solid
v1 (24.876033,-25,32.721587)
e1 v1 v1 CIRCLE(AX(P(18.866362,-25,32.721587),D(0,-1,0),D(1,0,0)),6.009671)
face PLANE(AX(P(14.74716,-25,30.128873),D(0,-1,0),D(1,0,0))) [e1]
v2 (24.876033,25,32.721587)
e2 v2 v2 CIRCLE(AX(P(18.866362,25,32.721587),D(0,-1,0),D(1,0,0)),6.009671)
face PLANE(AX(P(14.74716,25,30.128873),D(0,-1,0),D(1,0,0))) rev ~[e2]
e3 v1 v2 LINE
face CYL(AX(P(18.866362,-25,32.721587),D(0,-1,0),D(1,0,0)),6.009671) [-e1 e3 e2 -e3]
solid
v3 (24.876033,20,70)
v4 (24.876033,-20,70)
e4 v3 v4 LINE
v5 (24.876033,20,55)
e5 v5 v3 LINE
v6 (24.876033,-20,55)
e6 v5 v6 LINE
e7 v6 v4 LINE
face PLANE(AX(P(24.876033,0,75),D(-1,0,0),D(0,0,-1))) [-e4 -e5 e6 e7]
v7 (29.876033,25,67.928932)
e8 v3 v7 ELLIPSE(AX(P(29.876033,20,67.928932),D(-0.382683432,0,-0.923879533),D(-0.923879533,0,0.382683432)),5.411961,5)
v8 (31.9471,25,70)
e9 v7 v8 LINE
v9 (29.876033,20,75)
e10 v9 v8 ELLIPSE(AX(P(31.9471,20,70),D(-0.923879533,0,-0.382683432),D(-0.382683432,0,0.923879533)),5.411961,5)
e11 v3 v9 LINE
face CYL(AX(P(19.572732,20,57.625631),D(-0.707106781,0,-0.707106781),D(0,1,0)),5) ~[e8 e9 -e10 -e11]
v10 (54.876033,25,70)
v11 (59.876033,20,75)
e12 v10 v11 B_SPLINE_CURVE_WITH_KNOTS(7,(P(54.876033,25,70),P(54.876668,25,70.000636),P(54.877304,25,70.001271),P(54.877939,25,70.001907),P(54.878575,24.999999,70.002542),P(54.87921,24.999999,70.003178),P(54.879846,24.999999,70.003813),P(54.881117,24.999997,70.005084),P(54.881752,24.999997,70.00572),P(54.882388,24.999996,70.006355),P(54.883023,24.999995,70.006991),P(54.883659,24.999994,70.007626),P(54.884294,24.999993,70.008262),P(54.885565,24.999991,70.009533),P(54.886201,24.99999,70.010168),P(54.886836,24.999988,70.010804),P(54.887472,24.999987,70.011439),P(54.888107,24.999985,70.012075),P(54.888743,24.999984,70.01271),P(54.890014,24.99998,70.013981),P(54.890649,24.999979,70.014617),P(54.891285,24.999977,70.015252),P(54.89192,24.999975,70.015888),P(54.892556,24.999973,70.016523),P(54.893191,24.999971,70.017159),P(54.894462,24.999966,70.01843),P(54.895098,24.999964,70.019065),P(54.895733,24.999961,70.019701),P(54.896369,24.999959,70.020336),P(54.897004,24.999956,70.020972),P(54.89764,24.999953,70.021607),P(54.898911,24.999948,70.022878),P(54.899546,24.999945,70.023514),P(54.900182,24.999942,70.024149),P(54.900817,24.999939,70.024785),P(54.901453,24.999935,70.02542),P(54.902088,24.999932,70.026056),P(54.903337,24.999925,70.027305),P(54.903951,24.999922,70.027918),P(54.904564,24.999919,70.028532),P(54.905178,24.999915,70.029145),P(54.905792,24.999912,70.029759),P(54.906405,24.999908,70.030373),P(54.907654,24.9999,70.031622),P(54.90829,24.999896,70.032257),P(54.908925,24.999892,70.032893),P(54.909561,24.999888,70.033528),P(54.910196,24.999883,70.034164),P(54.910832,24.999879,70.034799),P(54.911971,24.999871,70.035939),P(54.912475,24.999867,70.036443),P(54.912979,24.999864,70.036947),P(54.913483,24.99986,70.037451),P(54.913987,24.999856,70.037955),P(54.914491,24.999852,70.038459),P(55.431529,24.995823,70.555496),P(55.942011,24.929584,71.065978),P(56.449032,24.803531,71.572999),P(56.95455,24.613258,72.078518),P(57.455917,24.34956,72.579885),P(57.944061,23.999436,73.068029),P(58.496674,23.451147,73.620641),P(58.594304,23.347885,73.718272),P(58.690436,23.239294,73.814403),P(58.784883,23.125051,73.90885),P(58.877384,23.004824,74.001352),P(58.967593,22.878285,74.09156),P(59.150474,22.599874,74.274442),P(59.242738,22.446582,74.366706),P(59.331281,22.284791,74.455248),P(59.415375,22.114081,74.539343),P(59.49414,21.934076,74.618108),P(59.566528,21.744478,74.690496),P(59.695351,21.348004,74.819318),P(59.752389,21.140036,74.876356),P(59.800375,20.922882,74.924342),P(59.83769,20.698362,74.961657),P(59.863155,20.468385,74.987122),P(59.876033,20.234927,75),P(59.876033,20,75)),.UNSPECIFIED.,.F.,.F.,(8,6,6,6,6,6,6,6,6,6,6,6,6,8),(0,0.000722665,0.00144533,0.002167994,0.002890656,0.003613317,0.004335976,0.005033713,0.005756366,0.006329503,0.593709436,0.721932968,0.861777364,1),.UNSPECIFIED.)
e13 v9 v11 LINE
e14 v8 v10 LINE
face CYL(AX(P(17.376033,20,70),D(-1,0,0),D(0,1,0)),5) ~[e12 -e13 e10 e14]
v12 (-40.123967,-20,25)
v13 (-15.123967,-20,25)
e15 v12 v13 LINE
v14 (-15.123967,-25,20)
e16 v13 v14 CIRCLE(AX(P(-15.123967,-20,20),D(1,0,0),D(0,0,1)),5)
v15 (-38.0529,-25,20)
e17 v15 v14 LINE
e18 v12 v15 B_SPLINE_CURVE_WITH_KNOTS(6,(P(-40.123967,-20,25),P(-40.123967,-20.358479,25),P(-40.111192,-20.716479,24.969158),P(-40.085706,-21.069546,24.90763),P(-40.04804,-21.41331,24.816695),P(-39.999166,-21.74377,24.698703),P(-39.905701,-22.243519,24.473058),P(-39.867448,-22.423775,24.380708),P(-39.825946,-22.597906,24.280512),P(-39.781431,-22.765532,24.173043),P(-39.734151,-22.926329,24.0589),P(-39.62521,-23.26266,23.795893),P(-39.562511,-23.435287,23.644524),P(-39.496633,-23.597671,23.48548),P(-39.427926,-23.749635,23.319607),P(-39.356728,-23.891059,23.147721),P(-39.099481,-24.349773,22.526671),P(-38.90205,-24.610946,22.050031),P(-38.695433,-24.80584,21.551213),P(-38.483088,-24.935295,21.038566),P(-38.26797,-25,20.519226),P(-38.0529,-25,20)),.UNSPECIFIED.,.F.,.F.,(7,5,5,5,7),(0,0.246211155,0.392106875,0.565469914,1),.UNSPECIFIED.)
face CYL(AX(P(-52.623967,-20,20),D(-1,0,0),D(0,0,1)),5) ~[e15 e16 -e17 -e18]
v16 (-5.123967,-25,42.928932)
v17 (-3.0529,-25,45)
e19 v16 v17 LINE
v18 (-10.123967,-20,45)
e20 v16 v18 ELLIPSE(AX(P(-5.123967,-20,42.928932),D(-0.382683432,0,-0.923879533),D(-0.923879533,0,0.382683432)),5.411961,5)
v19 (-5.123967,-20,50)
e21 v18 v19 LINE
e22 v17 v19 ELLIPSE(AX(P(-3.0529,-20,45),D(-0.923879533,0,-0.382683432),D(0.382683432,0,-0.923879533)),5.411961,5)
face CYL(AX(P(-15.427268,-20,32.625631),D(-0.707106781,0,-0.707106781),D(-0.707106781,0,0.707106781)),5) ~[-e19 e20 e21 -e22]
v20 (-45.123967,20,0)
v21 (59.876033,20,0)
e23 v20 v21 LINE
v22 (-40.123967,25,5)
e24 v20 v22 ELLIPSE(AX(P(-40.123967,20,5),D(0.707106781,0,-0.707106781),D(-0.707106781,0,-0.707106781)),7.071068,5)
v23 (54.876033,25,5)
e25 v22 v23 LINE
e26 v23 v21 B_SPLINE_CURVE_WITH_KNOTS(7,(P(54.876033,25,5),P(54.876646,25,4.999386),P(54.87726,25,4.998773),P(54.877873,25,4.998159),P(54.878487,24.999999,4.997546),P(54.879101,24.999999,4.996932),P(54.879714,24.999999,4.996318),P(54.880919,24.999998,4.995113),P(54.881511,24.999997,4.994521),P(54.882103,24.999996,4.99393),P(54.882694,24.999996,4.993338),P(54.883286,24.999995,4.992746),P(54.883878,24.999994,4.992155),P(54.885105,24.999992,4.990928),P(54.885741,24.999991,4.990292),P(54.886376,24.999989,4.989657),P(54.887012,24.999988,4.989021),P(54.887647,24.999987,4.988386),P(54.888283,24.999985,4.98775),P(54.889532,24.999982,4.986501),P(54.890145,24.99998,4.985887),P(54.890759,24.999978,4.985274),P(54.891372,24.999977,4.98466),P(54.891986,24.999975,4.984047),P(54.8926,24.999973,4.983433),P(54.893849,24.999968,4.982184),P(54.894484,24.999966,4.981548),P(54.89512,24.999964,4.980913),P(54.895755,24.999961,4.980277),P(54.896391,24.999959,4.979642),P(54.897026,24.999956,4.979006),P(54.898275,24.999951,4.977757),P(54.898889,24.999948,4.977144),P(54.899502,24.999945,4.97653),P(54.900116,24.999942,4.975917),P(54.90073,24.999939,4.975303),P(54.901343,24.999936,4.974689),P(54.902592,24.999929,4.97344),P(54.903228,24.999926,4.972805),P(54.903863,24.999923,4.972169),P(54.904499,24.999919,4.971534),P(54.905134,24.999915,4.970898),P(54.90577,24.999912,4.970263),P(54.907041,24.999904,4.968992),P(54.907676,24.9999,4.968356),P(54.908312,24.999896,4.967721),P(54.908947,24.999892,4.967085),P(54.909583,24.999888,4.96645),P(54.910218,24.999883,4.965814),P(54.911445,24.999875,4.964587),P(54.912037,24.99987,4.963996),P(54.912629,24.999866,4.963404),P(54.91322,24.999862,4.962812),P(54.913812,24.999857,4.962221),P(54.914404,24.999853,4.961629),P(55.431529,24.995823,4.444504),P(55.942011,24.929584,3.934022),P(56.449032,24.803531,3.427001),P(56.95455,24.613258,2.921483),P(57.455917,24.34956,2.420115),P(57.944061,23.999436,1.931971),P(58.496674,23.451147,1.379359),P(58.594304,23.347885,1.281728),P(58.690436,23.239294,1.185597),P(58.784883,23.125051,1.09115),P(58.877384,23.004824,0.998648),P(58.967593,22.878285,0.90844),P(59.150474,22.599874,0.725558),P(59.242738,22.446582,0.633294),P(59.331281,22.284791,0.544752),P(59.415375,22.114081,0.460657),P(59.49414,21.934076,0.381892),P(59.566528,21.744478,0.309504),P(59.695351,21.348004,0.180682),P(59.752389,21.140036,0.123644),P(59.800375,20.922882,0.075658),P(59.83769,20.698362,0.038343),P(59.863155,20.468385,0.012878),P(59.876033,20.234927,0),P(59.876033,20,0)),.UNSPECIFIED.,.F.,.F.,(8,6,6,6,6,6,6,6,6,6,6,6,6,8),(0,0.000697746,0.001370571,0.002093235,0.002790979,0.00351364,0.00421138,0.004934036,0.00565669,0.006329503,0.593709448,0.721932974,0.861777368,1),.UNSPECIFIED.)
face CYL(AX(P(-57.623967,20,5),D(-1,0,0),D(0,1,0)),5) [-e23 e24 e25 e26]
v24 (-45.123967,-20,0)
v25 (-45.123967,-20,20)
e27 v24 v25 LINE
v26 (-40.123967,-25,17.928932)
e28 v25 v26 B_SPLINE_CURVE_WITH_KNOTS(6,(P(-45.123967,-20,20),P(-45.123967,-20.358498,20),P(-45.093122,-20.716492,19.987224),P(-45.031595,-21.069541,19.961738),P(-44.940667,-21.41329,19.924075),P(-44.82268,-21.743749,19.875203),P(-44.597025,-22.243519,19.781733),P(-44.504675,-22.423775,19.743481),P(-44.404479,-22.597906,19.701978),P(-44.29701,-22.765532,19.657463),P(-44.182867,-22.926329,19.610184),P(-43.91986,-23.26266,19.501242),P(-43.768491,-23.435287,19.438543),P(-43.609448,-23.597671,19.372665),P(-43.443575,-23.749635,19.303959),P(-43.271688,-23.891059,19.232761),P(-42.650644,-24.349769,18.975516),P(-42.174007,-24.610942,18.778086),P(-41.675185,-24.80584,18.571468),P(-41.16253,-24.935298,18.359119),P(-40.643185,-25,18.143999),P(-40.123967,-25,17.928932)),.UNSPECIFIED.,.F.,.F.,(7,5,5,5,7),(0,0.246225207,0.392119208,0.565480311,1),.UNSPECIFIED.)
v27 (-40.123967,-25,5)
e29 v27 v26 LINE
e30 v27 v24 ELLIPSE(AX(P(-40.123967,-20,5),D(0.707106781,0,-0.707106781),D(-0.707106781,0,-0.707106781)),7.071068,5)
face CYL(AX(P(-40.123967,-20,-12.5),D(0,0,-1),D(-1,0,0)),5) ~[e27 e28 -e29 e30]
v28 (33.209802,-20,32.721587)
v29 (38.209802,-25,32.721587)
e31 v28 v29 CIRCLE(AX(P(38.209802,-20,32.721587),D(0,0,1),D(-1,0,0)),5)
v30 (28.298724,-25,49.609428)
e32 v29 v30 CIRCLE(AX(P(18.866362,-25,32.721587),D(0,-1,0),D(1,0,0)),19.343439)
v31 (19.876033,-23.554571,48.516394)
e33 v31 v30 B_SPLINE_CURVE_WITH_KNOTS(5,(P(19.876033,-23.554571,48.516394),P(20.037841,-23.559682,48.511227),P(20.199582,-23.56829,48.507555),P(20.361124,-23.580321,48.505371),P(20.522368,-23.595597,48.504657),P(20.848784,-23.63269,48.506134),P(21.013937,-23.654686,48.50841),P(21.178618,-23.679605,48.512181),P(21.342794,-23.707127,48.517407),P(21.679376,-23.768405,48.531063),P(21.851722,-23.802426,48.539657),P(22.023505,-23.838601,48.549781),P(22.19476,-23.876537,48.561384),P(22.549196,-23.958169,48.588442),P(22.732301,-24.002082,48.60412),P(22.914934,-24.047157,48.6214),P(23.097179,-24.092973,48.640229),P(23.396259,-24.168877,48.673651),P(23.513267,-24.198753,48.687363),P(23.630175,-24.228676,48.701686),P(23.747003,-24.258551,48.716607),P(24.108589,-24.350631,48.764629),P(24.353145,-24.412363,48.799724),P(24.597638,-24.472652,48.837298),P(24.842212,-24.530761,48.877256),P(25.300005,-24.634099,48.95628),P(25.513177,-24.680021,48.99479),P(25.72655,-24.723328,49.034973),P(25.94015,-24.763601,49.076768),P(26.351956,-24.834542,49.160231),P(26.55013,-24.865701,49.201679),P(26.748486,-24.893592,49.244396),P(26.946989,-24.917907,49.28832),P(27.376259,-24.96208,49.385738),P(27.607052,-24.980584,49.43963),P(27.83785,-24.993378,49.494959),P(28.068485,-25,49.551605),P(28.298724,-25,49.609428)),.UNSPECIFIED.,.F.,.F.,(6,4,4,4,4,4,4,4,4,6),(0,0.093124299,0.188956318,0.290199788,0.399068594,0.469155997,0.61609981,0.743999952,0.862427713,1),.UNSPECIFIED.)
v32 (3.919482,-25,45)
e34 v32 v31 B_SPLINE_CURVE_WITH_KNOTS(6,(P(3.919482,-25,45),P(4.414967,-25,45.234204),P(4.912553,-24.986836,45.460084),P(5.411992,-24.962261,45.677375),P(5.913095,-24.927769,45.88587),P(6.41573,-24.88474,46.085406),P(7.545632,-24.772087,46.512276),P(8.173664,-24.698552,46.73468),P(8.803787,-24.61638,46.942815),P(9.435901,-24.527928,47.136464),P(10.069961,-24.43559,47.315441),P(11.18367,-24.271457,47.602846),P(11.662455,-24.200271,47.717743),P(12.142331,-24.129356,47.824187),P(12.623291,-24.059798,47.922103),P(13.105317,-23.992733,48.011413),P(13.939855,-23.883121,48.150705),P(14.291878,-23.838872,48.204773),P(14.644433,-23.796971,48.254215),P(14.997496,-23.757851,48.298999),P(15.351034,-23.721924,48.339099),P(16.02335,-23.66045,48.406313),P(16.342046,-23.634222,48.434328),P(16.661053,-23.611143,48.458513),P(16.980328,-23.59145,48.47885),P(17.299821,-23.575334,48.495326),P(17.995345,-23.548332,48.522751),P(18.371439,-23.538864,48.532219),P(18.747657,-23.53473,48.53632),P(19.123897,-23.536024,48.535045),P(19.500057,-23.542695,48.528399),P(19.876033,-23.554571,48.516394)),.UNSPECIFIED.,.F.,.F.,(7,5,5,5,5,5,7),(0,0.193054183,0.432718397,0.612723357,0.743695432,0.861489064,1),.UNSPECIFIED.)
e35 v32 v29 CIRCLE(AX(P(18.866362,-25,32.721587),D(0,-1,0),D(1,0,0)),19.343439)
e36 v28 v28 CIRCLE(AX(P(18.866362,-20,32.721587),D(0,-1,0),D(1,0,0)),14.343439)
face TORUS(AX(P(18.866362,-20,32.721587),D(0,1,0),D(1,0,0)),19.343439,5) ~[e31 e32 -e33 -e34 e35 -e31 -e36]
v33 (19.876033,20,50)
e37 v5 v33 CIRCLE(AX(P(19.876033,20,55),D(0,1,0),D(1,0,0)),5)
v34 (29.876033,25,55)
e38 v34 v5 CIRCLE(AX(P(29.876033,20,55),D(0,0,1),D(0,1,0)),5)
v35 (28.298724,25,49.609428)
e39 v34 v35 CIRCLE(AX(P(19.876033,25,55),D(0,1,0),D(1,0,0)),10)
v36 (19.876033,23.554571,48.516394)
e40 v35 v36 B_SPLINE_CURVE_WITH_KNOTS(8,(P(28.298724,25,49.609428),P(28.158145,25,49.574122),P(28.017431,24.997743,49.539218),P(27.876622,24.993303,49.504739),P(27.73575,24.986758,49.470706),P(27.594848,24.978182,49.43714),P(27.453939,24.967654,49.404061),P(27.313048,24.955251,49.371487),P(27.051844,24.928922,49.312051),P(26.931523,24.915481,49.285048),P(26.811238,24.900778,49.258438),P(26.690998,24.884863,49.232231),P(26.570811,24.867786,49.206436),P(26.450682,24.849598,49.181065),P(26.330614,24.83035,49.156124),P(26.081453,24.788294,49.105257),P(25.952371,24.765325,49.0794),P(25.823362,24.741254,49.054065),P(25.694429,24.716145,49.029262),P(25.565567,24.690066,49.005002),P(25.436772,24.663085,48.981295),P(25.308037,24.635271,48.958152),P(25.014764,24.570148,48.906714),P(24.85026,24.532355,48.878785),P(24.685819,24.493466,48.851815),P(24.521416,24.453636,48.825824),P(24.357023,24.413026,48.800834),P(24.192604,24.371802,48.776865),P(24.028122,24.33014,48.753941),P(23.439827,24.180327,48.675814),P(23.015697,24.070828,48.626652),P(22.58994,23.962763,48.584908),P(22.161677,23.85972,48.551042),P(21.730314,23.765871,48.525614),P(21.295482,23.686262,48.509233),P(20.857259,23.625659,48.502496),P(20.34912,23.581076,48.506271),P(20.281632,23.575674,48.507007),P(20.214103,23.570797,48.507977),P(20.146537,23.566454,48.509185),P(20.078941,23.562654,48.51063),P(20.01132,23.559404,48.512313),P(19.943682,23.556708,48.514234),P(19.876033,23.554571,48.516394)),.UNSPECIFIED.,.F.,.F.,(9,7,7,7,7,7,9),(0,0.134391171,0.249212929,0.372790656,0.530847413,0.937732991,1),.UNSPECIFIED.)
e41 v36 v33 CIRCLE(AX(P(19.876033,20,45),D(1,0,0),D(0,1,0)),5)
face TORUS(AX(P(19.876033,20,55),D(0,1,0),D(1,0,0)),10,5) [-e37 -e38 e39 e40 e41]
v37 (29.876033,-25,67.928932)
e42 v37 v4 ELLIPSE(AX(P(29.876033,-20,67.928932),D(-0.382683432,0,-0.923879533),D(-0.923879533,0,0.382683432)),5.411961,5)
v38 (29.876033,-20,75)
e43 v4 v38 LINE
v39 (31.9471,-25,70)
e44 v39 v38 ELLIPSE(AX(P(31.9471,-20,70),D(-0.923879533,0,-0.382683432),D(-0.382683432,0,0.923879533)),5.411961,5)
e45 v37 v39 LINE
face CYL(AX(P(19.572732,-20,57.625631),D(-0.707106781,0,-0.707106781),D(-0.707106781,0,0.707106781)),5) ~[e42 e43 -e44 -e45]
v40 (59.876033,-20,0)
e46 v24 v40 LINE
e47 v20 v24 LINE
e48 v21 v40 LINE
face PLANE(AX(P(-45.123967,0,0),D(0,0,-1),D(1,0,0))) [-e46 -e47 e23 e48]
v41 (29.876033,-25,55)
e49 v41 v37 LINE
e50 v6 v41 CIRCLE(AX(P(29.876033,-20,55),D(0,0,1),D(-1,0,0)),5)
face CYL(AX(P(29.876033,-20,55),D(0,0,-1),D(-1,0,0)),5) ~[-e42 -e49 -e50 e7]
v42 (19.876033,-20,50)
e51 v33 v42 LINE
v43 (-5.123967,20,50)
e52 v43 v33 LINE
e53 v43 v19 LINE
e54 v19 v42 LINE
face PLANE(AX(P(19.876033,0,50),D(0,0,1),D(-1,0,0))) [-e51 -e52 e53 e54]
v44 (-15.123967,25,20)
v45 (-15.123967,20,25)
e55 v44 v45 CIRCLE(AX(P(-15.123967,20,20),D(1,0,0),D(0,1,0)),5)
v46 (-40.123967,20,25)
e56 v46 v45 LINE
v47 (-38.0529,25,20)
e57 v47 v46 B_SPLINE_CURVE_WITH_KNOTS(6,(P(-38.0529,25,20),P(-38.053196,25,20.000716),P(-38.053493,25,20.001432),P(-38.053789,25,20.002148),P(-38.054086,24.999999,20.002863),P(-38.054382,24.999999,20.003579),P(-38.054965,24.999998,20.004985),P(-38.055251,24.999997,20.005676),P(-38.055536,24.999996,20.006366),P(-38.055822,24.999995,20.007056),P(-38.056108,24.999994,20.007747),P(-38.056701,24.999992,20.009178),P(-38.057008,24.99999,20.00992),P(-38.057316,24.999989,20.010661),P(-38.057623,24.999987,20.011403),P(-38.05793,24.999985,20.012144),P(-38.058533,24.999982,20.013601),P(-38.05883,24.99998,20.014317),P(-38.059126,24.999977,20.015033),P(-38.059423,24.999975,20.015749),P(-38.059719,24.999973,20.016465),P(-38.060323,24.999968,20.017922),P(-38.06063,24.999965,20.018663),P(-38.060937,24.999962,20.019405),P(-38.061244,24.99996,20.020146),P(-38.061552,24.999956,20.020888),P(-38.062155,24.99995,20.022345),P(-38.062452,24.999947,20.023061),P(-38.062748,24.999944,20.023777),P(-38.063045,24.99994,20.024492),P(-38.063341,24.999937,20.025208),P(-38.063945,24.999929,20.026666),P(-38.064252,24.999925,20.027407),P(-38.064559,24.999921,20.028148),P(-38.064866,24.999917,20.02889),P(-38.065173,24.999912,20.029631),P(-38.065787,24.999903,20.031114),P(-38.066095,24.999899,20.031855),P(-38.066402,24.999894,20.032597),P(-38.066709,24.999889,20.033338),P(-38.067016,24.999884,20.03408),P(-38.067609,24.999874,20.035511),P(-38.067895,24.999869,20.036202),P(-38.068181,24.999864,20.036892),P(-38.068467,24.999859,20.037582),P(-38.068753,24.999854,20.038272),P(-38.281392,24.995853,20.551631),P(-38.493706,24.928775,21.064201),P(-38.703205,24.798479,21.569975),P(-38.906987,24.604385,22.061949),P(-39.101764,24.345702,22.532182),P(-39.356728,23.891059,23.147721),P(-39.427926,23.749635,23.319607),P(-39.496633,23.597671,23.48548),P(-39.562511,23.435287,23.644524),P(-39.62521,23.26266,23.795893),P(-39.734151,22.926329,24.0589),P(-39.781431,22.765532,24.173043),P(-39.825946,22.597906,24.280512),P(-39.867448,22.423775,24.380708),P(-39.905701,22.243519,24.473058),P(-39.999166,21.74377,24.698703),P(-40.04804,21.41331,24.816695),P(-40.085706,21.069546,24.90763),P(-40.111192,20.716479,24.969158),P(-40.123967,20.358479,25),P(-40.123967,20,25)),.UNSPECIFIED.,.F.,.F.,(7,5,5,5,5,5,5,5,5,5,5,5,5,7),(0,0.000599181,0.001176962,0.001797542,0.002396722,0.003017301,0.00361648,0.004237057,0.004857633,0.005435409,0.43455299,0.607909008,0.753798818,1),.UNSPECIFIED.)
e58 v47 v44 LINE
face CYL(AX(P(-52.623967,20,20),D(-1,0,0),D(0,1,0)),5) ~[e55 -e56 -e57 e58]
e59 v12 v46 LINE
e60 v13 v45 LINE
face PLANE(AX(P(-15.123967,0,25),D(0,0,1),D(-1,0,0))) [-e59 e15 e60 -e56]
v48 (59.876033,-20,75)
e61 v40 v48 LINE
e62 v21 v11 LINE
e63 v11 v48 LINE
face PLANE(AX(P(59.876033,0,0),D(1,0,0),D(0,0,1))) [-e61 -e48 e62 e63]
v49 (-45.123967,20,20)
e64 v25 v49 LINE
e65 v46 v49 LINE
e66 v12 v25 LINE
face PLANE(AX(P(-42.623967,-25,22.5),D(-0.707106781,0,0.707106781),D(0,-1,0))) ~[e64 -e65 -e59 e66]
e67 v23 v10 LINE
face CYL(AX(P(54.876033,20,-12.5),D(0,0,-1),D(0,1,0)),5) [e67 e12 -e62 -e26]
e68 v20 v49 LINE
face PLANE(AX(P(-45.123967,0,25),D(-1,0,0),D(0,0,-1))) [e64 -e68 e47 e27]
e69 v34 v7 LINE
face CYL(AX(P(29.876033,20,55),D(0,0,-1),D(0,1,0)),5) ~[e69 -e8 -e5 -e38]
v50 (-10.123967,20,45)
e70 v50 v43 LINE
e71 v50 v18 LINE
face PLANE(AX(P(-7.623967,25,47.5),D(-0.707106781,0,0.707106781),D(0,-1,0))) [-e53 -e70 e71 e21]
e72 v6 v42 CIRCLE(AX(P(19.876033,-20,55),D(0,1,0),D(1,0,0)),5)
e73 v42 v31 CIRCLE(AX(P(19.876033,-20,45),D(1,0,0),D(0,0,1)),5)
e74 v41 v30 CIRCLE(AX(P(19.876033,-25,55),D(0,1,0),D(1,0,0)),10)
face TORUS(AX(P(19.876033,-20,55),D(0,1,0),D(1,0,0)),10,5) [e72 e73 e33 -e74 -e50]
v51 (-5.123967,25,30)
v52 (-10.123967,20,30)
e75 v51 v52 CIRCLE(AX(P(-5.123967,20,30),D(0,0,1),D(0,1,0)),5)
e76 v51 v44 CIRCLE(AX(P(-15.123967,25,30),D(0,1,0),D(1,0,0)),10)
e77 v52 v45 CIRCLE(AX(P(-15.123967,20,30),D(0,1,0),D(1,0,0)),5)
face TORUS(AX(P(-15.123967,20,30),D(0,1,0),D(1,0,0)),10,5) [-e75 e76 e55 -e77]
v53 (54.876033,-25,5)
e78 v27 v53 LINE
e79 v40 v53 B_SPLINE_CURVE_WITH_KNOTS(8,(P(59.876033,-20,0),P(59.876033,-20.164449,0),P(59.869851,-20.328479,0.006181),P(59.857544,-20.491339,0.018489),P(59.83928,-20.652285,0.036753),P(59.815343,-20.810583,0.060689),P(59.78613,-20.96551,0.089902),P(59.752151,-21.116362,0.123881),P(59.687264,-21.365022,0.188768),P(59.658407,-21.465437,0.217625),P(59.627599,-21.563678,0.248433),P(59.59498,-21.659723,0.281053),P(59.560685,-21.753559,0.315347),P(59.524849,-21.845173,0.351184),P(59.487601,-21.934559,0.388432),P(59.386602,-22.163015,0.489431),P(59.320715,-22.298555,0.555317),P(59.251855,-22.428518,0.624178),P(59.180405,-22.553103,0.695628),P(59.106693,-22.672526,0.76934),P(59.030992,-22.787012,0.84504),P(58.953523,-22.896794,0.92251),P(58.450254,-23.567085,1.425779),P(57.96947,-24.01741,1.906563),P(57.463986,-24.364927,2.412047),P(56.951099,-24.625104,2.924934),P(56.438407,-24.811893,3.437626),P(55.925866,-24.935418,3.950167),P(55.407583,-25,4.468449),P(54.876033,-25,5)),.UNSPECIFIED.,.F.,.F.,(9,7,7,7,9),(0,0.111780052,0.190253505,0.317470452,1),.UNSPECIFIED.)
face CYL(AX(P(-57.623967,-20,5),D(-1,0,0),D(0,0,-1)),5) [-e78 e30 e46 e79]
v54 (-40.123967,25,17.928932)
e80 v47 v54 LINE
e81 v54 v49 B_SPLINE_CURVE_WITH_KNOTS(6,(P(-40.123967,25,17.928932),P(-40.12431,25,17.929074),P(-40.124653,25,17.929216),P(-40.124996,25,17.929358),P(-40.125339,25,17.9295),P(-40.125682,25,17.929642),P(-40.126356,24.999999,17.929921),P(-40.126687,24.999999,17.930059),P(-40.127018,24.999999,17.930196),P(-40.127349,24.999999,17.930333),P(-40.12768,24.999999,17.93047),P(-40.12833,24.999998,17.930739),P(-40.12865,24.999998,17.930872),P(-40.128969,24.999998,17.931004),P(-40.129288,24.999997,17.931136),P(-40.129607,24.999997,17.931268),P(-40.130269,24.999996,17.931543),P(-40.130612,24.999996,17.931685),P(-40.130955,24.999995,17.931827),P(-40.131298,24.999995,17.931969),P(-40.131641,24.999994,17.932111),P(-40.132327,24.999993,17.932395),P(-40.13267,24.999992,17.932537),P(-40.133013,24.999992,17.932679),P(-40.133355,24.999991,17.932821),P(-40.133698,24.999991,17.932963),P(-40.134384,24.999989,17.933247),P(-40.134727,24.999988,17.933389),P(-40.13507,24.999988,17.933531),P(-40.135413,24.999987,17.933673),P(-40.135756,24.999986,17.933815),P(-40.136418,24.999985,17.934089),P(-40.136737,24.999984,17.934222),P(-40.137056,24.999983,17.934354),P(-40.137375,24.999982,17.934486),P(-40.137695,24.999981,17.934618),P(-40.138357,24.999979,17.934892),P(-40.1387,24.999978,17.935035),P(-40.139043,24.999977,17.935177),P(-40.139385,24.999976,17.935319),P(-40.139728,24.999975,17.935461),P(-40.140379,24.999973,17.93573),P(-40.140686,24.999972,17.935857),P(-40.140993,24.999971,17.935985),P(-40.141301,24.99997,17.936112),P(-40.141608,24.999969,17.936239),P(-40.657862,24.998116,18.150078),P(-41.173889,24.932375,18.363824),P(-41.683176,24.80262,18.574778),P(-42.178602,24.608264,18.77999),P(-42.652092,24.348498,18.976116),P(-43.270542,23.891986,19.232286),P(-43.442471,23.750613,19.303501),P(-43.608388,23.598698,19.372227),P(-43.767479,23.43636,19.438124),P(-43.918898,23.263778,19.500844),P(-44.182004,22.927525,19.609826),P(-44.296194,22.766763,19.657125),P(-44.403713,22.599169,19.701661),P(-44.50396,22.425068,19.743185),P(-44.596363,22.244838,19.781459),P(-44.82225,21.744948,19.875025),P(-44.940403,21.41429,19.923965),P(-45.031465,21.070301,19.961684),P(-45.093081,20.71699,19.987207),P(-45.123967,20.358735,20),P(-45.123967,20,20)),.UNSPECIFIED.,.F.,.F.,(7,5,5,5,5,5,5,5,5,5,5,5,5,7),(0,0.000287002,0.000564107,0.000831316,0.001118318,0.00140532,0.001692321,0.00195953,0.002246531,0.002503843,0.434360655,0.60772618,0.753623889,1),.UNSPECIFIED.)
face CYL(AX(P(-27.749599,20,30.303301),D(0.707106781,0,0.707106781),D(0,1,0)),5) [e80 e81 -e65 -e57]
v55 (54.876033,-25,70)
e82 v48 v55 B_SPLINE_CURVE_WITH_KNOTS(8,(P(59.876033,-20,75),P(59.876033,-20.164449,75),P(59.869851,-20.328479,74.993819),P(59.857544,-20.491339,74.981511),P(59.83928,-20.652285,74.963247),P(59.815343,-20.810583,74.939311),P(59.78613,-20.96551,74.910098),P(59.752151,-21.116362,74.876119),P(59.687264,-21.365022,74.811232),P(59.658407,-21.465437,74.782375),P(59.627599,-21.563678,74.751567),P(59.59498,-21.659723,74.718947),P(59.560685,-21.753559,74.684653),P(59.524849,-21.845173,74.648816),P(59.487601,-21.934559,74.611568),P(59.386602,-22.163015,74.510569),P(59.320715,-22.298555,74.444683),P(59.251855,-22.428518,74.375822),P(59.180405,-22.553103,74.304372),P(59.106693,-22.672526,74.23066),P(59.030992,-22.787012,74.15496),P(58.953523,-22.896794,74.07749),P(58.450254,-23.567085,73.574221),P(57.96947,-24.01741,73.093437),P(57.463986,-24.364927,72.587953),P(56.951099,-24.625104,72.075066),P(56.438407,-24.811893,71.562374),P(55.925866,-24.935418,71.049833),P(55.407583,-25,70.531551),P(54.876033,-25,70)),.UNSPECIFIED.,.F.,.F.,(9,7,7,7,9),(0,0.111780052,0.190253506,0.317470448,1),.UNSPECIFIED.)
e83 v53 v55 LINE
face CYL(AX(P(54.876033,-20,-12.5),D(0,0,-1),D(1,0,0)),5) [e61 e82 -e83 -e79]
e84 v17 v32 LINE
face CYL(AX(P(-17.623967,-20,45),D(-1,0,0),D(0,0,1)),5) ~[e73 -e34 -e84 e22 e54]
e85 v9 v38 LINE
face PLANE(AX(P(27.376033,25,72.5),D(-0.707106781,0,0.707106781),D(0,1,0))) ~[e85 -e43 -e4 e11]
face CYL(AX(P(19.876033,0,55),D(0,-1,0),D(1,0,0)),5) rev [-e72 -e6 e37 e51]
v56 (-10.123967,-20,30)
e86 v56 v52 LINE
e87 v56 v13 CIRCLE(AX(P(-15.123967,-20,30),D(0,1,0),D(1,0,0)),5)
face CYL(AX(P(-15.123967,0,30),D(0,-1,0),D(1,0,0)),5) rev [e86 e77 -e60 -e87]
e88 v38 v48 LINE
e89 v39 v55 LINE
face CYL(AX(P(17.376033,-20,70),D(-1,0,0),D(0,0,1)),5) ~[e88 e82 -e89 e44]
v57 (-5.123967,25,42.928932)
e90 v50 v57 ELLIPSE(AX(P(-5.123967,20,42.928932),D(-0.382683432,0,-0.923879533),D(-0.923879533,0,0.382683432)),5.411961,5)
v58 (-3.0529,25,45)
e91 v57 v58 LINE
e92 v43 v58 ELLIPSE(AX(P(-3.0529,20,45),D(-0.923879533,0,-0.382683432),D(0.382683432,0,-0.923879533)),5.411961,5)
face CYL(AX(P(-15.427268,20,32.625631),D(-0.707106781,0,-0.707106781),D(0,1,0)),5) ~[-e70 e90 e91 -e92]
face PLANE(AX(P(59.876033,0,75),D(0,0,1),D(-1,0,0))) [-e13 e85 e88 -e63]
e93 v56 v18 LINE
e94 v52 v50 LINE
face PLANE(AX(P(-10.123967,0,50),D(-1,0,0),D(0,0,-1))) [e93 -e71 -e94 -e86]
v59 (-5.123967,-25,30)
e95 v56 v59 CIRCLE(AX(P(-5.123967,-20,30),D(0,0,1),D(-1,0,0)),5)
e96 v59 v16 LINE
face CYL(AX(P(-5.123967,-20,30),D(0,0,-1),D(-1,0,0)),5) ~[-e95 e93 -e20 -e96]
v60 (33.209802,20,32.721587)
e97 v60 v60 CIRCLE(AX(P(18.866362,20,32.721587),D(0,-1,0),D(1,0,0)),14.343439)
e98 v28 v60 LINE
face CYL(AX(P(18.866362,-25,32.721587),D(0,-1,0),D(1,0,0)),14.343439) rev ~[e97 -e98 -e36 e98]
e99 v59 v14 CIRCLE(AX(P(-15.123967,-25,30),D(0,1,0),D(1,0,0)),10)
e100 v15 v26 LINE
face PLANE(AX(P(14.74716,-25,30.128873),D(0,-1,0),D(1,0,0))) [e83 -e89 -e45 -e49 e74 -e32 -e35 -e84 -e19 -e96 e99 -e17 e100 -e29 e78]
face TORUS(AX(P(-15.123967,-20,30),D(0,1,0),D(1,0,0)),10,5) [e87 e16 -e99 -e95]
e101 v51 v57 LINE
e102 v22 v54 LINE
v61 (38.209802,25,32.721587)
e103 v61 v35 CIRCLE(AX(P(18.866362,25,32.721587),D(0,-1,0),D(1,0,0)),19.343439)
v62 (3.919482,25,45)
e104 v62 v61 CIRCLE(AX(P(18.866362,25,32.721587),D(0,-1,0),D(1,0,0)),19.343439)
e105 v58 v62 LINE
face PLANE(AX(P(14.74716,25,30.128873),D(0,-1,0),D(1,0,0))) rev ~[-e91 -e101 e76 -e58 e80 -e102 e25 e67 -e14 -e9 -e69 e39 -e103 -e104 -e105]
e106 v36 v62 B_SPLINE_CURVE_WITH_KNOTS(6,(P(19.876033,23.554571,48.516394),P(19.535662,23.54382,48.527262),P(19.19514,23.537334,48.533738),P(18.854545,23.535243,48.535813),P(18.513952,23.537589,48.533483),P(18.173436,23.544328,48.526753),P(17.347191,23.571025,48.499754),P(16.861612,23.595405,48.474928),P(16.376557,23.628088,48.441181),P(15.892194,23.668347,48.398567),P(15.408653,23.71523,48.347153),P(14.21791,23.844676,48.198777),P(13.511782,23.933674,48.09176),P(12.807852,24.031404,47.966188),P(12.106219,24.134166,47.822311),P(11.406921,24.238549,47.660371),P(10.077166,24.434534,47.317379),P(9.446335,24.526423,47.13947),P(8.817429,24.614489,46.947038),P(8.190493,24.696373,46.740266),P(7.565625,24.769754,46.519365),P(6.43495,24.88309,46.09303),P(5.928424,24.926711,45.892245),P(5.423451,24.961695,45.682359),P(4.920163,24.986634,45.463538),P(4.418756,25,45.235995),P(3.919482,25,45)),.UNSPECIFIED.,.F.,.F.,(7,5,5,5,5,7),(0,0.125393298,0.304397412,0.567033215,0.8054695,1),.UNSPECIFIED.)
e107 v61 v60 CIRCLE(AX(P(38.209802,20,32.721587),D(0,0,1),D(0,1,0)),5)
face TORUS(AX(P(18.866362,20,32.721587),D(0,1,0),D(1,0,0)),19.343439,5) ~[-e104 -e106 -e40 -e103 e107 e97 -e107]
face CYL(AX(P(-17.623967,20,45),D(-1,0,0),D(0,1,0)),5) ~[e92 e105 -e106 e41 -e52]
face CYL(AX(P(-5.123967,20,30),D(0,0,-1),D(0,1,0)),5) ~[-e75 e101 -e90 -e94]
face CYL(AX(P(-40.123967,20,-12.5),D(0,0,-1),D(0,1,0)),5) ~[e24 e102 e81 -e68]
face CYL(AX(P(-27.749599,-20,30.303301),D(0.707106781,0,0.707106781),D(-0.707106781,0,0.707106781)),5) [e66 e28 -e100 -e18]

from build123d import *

# Parameters (mm, degrees)
F1_DEPTH     = 25
F2_R         = 14.3434394771
F2_R_2       = 6.0096705541
F3_DEPTH     = 50
F4_SIZE      = 5
F5_T1_DEPTH  = 55
F5_T3_DEPTH  = 32.0710678119
F5_T5_DEPTH  = 27.5
F5_T7_DEPTH  = 32.0710678119
F5_T9_DEPTH  = 27.5
F5_T11_DEPTH = 37.5
F5_T13_DEPTH = 37.5
F5_T15_DEPTH = 32.0710678119
F5_T17_DEPTH = 45
F5_T19_DEPTH = 130
F5_T21_DEPTH = 100
F5_T24_ANGLE = 90
F5_T26_ANGLE = 90
F5_T30_ANGLE = 90
F5_T32_ANGLE = 90


# Not quite as in the source:
# - a fillet or chamfer that OpenCascade refuses, or shapes differently, is made with other operations: its cross-section is extruded or revolved along the edge and cut away or added


with BuildPart() as f1:
    # F0 (on Front) → F1 (new body, symmetric)
    with BuildSketch(Plane.XZ):
        with BuildLine():
            Line((-45.1239673958, 25), (-45.1239673958, 0))
            Line((-45.1239673958, 0), (59.8760326042, 0))
            Line((59.8760326042, 0), (59.8760326042, 75))
            Line((59.8760326042, 75), (24.8760326042, 75))
            Line((24.8760326042, 75), (24.8760326042, 55))
            ThreePointArc((24.8760326042, 55), (23.4115665102, 51.4644660941), (19.8760326042, 50))
            Line((19.8760326042, 50), (-10.1239673958, 50))
            Line((-10.1239673958, 50), (-10.1239673958, 30))
            ThreePointArc((-10.1239673958, 30), (-11.5884334898, 26.4644660941), (-15.1239673958, 25))
            Line((-15.1239673958, 25), (-45.1239673958, 25))
        make_face()
    extrude(amount=F1_DEPTH, both=True)

    # F2 (on face) → F3 (cut, through all)
    with BuildSketch(Plane.XZ.offset(25)):
        with Locations((18.8663620502, 32.7215865254)):
            Circle(F2_R)
        with Locations((18.8663620502, 32.7215865254)):
            Circle(F2_R_2, mode=Mode.SUBTRACT)
    extrude(amount=-F3_DEPTH, mode=Mode.SUBTRACT)

    # F4
    f4_edges = [f1.edges().sort_by_distance(p)[0] for p in [
        (-45.123967, 0, 25),
        (-10.123967, 0, 50),
        (24.876033, 0, 75),
    ]]
    chamfer(f4_edges, length=F4_SIZE)

    # F5: fillet of radius 5 on 28 edges, made by hand

    # F5_s2 → F5_t1 (cut)
    with BuildSketch(Plane.YZ.offset(17.3760326042)):
        with BuildLine():
            ThreePointArc((-20, 75), (-23.5355339059, 73.5355339059), (-25, 70))
            Line((-25, 70), (-25, 75))
            Line((-25, 75), (-20, 75))
        make_face()
        with BuildLine():
            ThreePointArc((25, 70), (23.5355339059, 73.5355339059), (20, 75))
            Line((20, 75), (25, 75))
            Line((25, 75), (25, 70))
        make_face()
    extrude(amount=F5_T1_DEPTH, mode=Mode.SUBTRACT)

    # F5_s4 → F5_t3 (cut)
    with BuildSketch(Plane(origin=(38.5991815373, 0, 38.5991815373), x_dir=(0, 1, 0), z_dir=(0.7071067812, 0, 0.7071067812))):
        with BuildLine():
            ThreePointArc((-20, 31.9074633396), (-23.5355339059, 30.4429972455), (-25, 26.9074633396))
            Line((-25, 26.9074633396), (-25, 31.9074633396))
            Line((-25, 31.9074633396), (-20, 31.9074633396))
        make_face()
        with BuildLine():
            ThreePointArc((25, 26.9074633396), (23.5355339059, 30.4429972455), (20, 31.9074633396))
            Line((20, 31.9074633396), (25, 31.9074633396))
            Line((25, 31.9074633396), (25, 26.9074633396))
        make_face()
    extrude(amount=F5_T3_DEPTH, mode=Mode.SUBTRACT)

    # F5_s6 → F5_t5 (cut)
    with BuildSketch(Plane.XY.offset(55)):
        with BuildLine():
            ThreePointArc((24.8760326042, -20), (26.3404986983, -23.5355339059), (29.8760326042, -25))
            Line((29.8760326042, -25), (24.8760326042, -25))
            Line((24.8760326042, -25), (24.8760326042, -20))
        make_face()
        with BuildLine():
            ThreePointArc((29.8760326042, 25), (26.3404986983, 23.5355339059), (24.8760326042, 20))
            Line((24.8760326042, 20), (24.8760326042, 25))
            Line((24.8760326042, 25), (29.8760326042, 25))
        make_face()
    extrude(amount=F5_T5_DEPTH, mode=Mode.SUBTRACT)

    # F5_s8 → F5_t7 (cut)
    with BuildSketch(Plane(origin=(8.5991815373, 0, 8.5991815373), x_dir=(0, 1, 0), z_dir=(0.7071067812, 0, 0.7071067812))):
        with BuildLine():
            ThreePointArc((-20, 38.9785311515), (-23.5355339059, 37.5140650574), (-25, 33.9785311515))
            Line((-25, 33.9785311515), (-25, 38.9785311515))
            Line((-25, 38.9785311515), (-20, 38.9785311515))
        make_face()
        with BuildLine():
            ThreePointArc((25, 33.9785311515), (23.5355339059, 37.5140650574), (20, 38.9785311515))
            Line((20, 38.9785311515), (25, 38.9785311515))
            Line((25, 38.9785311515), (25, 33.9785311515))
        make_face()
    extrude(amount=F5_T7_DEPTH, mode=Mode.SUBTRACT)

    # F5_s10 → F5_t9 (cut)
    with BuildSketch(Plane.XY.offset(30)):
        with BuildLine():
            ThreePointArc((-10.1239673958, -20), (-8.6595013017, -23.5355339059), (-5.1239673958, -25))
            Line((-5.1239673958, -25), (-10.1239673958, -25))
            Line((-10.1239673958, -25), (-10.1239673958, -20))
        make_face()
        with BuildLine():
            ThreePointArc((-5.1239673958, 25), (-8.6595013017, 23.5355339059), (-10.1239673958, 20))
            Line((-10.1239673958, 20), (-10.1239673958, 25))
            Line((-10.1239673958, 25), (-5.1239673958, 25))
        make_face()
    extrude(amount=F5_T9_DEPTH, mode=Mode.SUBTRACT)

    # F5_s12 → F5_t11 (cut)
    with BuildSketch(Plane.YZ.offset(-17.6239673958)):
        with BuildLine():
            ThreePointArc((-20, 50), (-23.5355339059, 48.5355339059), (-25, 45))
            Line((-25, 45), (-25, 50))
            Line((-25, 50), (-20, 50))
        make_face()
        with BuildLine():
            ThreePointArc((25, 45), (23.5355339059, 48.5355339059), (20, 50))
            Line((20, 50), (25, 50))
            Line((25, 50), (25, 45))
        make_face()
    extrude(amount=F5_T11_DEPTH, mode=Mode.SUBTRACT)

    # F5_s14 → F5_t13 (cut)
    with BuildSketch(Plane.YZ.offset(-52.6239673958)):
        with BuildLine():
            ThreePointArc((-20, 25), (-23.5355339059, 23.5355339059), (-25, 20))
            Line((-25, 20), (-25, 25))
            Line((-25, 25), (-20, 25))
        make_face()
        with BuildLine():
            ThreePointArc((25, 20), (23.5355339059, 23.5355339059), (20, 25))
            Line((20, 25), (25, 25))
            Line((25, 25), (25, 20))
        make_face()
    extrude(amount=F5_T13_DEPTH, mode=Mode.SUBTRACT)

    # F5_s16 → F5_t15 (cut)
    with BuildSketch(Plane(origin=(1.2768510669, 0, 1.2768510669), x_dir=(0, 1, 0), z_dir=(-0.7071067812, 0, -0.7071067812))):
        with BuildLine():
            ThreePointArc((-20, -46.0495989633), (-23.5355339059, -44.5851328693), (-25, -41.0495989633))
            Line((-25, -41.0495989633), (-25, -46.0495989633))
            Line((-25, -46.0495989633), (-20, -46.0495989633))
        make_face()
        with BuildLine():
            ThreePointArc((25, -41.0495989633), (23.5355339059, -44.5851328693), (20, -46.0495989633))
            Line((20, -46.0495989633), (25, -46.0495989633))
            Line((25, -46.0495989633), (25, -41.0495989633))
        make_face()
    extrude(amount=F5_T15_DEPTH, mode=Mode.SUBTRACT)

    # F5_s18 → F5_t17 (cut)
    with BuildSketch(Plane.XY.offset(-12.5)):
        with BuildLine():
            ThreePointArc((-45.1239673958, -20), (-43.6595013017, -23.5355339059), (-40.1239673958, -25))
            Line((-40.1239673958, -25), (-45.1239673958, -25))
            Line((-45.1239673958, -25), (-45.1239673958, -20))
        make_face()
        with BuildLine():
            ThreePointArc((-40.1239673958, 25), (-43.6595013017, 23.5355339059), (-45.1239673958, 20))
            Line((-45.1239673958, 20), (-45.1239673958, 25))
            Line((-45.1239673958, 25), (-40.1239673958, 25))
        make_face()
    extrude(amount=F5_T17_DEPTH, mode=Mode.SUBTRACT)

    # F5_s20 → F5_t19 (cut)
    with BuildSketch(Plane.YZ.offset(-57.6239673958)):
        with BuildLine():
            ThreePointArc((-20, 0), (-23.5355339059, 1.4644660941), (-25, 5))
            Line((-25, 5), (-25, 0))
            Line((-25, 0), (-20, 0))
        make_face()
        with BuildLine():
            ThreePointArc((25, 5), (23.5355339059, 1.4644660941), (20, 0))
            Line((20, 0), (25, 0))
            Line((25, 0), (25, 5))
        make_face()
    extrude(amount=F5_T19_DEPTH, mode=Mode.SUBTRACT)

    # F5_s22 → F5_t21 (cut)
    with BuildSketch(Plane.XY.offset(-12.5)):
        with BuildLine():
            ThreePointArc((59.8760326042, -20), (58.4115665102, -23.5355339059), (54.8760326042, -25))
            Line((54.8760326042, -25), (59.8760326042, -25))
            Line((59.8760326042, -25), (59.8760326042, -20))
        make_face()
        with BuildLine():
            ThreePointArc((54.8760326042, 25), (58.4115665102, 23.5355339059), (59.8760326042, 20))
            Line((59.8760326042, 20), (59.8760326042, 25))
            Line((59.8760326042, 25), (54.8760326042, 25))
        make_face()
    extrude(amount=F5_T21_DEPTH, mode=Mode.SUBTRACT)

    # F5_s23 → F5_t24 (revolve, cut)
    with BuildSketch(Plane.XY.offset(55)):
        with BuildLine():
            ThreePointArc((24.8760326042, -20), (26.3404986983, -23.5355339059), (29.8760326042, -25))
            Line((29.8760326042, -25), (24.8760326042, -25))
            Line((24.8760326042, -25), (24.8760326042, -20))
        make_face()
    revolve(axis=Axis((19.8760326042, -25, 55), (0, 1, 0)), revolution_arc=F5_T24_ANGLE, mode=Mode.SUBTRACT)

    # F5_s25 → F5_t26 (revolve, cut)
    with BuildSketch(Plane.XY.offset(30)):
        with BuildLine():
            ThreePointArc((-10.1239673958, -20), (-8.6595013017, -23.5355339059), (-5.1239673958, -25))
            Line((-5.1239673958, -25), (-10.1239673958, -25))
            Line((-10.1239673958, -25), (-10.1239673958, -20))
        make_face()
    revolve(axis=Axis((-15.1239673958, -25, 30), (0, 1, 0)), revolution_arc=F5_T26_ANGLE, mode=Mode.SUBTRACT)

    # F5_s27 → F5_t28 (revolve, cut)
    with BuildSketch(Plane.XY.offset(32.7215865254)):
        with BuildLine():
            ThreePointArc((33.2098015273, -20), (34.6742676213, -23.5355339059), (38.2098015273, -25))
            Line((38.2098015273, -25), (33.2098015273, -25))
            Line((33.2098015273, -25), (33.2098015273, -20))
        make_face()
    revolve(axis=Axis((18.8663620502, -25, 32.7215865254), (0, -1, 0)), mode=Mode.SUBTRACT)

    # F5_s29 → F5_t30 (revolve, cut)
    with BuildSketch(Plane.XY.offset(30)):
        with BuildLine():
            ThreePointArc((-5.1239673958, 25), (-8.6595013017, 23.5355339059), (-10.1239673958, 20))
            Line((-10.1239673958, 20), (-10.1239673958, 25))
            Line((-10.1239673958, 25), (-5.1239673958, 25))
        make_face()
    revolve(axis=Axis((-15.1239673958, 25, 30), (0, 1, 0)), revolution_arc=F5_T30_ANGLE, mode=Mode.SUBTRACT)

    # F5_s31 → F5_t32 (revolve, cut)
    with BuildSketch(Plane.XY.offset(55)):
        with BuildLine():
            ThreePointArc((29.8760326042, 25), (26.3404986983, 23.5355339059), (24.8760326042, 20))
            Line((24.8760326042, 20), (24.8760326042, 25))
            Line((24.8760326042, 25), (29.8760326042, 25))
        make_face()
    revolve(axis=Axis((19.8760326042, 25, 55), (0, 1, 0)), revolution_arc=F5_T32_ANGLE, mode=Mode.SUBTRACT)

    # F5_s33 → F5_t34 (revolve, cut)
    with BuildSketch(Plane.XY.offset(32.7215865254)):
        with BuildLine():
            ThreePointArc((38.2098015273, 25), (34.6742676213, 23.5355339059), (33.2098015273, 20))
            Line((33.2098015273, 20), (33.2098015273, 25))
            Line((33.2098015273, 25), (38.2098015273, 25))
        make_face()
    revolve(axis=Axis((18.8663620502, 25, 32.7215865254), (0, -1, 0)), mode=Mode.SUBTRACT)


solid = f1.part
